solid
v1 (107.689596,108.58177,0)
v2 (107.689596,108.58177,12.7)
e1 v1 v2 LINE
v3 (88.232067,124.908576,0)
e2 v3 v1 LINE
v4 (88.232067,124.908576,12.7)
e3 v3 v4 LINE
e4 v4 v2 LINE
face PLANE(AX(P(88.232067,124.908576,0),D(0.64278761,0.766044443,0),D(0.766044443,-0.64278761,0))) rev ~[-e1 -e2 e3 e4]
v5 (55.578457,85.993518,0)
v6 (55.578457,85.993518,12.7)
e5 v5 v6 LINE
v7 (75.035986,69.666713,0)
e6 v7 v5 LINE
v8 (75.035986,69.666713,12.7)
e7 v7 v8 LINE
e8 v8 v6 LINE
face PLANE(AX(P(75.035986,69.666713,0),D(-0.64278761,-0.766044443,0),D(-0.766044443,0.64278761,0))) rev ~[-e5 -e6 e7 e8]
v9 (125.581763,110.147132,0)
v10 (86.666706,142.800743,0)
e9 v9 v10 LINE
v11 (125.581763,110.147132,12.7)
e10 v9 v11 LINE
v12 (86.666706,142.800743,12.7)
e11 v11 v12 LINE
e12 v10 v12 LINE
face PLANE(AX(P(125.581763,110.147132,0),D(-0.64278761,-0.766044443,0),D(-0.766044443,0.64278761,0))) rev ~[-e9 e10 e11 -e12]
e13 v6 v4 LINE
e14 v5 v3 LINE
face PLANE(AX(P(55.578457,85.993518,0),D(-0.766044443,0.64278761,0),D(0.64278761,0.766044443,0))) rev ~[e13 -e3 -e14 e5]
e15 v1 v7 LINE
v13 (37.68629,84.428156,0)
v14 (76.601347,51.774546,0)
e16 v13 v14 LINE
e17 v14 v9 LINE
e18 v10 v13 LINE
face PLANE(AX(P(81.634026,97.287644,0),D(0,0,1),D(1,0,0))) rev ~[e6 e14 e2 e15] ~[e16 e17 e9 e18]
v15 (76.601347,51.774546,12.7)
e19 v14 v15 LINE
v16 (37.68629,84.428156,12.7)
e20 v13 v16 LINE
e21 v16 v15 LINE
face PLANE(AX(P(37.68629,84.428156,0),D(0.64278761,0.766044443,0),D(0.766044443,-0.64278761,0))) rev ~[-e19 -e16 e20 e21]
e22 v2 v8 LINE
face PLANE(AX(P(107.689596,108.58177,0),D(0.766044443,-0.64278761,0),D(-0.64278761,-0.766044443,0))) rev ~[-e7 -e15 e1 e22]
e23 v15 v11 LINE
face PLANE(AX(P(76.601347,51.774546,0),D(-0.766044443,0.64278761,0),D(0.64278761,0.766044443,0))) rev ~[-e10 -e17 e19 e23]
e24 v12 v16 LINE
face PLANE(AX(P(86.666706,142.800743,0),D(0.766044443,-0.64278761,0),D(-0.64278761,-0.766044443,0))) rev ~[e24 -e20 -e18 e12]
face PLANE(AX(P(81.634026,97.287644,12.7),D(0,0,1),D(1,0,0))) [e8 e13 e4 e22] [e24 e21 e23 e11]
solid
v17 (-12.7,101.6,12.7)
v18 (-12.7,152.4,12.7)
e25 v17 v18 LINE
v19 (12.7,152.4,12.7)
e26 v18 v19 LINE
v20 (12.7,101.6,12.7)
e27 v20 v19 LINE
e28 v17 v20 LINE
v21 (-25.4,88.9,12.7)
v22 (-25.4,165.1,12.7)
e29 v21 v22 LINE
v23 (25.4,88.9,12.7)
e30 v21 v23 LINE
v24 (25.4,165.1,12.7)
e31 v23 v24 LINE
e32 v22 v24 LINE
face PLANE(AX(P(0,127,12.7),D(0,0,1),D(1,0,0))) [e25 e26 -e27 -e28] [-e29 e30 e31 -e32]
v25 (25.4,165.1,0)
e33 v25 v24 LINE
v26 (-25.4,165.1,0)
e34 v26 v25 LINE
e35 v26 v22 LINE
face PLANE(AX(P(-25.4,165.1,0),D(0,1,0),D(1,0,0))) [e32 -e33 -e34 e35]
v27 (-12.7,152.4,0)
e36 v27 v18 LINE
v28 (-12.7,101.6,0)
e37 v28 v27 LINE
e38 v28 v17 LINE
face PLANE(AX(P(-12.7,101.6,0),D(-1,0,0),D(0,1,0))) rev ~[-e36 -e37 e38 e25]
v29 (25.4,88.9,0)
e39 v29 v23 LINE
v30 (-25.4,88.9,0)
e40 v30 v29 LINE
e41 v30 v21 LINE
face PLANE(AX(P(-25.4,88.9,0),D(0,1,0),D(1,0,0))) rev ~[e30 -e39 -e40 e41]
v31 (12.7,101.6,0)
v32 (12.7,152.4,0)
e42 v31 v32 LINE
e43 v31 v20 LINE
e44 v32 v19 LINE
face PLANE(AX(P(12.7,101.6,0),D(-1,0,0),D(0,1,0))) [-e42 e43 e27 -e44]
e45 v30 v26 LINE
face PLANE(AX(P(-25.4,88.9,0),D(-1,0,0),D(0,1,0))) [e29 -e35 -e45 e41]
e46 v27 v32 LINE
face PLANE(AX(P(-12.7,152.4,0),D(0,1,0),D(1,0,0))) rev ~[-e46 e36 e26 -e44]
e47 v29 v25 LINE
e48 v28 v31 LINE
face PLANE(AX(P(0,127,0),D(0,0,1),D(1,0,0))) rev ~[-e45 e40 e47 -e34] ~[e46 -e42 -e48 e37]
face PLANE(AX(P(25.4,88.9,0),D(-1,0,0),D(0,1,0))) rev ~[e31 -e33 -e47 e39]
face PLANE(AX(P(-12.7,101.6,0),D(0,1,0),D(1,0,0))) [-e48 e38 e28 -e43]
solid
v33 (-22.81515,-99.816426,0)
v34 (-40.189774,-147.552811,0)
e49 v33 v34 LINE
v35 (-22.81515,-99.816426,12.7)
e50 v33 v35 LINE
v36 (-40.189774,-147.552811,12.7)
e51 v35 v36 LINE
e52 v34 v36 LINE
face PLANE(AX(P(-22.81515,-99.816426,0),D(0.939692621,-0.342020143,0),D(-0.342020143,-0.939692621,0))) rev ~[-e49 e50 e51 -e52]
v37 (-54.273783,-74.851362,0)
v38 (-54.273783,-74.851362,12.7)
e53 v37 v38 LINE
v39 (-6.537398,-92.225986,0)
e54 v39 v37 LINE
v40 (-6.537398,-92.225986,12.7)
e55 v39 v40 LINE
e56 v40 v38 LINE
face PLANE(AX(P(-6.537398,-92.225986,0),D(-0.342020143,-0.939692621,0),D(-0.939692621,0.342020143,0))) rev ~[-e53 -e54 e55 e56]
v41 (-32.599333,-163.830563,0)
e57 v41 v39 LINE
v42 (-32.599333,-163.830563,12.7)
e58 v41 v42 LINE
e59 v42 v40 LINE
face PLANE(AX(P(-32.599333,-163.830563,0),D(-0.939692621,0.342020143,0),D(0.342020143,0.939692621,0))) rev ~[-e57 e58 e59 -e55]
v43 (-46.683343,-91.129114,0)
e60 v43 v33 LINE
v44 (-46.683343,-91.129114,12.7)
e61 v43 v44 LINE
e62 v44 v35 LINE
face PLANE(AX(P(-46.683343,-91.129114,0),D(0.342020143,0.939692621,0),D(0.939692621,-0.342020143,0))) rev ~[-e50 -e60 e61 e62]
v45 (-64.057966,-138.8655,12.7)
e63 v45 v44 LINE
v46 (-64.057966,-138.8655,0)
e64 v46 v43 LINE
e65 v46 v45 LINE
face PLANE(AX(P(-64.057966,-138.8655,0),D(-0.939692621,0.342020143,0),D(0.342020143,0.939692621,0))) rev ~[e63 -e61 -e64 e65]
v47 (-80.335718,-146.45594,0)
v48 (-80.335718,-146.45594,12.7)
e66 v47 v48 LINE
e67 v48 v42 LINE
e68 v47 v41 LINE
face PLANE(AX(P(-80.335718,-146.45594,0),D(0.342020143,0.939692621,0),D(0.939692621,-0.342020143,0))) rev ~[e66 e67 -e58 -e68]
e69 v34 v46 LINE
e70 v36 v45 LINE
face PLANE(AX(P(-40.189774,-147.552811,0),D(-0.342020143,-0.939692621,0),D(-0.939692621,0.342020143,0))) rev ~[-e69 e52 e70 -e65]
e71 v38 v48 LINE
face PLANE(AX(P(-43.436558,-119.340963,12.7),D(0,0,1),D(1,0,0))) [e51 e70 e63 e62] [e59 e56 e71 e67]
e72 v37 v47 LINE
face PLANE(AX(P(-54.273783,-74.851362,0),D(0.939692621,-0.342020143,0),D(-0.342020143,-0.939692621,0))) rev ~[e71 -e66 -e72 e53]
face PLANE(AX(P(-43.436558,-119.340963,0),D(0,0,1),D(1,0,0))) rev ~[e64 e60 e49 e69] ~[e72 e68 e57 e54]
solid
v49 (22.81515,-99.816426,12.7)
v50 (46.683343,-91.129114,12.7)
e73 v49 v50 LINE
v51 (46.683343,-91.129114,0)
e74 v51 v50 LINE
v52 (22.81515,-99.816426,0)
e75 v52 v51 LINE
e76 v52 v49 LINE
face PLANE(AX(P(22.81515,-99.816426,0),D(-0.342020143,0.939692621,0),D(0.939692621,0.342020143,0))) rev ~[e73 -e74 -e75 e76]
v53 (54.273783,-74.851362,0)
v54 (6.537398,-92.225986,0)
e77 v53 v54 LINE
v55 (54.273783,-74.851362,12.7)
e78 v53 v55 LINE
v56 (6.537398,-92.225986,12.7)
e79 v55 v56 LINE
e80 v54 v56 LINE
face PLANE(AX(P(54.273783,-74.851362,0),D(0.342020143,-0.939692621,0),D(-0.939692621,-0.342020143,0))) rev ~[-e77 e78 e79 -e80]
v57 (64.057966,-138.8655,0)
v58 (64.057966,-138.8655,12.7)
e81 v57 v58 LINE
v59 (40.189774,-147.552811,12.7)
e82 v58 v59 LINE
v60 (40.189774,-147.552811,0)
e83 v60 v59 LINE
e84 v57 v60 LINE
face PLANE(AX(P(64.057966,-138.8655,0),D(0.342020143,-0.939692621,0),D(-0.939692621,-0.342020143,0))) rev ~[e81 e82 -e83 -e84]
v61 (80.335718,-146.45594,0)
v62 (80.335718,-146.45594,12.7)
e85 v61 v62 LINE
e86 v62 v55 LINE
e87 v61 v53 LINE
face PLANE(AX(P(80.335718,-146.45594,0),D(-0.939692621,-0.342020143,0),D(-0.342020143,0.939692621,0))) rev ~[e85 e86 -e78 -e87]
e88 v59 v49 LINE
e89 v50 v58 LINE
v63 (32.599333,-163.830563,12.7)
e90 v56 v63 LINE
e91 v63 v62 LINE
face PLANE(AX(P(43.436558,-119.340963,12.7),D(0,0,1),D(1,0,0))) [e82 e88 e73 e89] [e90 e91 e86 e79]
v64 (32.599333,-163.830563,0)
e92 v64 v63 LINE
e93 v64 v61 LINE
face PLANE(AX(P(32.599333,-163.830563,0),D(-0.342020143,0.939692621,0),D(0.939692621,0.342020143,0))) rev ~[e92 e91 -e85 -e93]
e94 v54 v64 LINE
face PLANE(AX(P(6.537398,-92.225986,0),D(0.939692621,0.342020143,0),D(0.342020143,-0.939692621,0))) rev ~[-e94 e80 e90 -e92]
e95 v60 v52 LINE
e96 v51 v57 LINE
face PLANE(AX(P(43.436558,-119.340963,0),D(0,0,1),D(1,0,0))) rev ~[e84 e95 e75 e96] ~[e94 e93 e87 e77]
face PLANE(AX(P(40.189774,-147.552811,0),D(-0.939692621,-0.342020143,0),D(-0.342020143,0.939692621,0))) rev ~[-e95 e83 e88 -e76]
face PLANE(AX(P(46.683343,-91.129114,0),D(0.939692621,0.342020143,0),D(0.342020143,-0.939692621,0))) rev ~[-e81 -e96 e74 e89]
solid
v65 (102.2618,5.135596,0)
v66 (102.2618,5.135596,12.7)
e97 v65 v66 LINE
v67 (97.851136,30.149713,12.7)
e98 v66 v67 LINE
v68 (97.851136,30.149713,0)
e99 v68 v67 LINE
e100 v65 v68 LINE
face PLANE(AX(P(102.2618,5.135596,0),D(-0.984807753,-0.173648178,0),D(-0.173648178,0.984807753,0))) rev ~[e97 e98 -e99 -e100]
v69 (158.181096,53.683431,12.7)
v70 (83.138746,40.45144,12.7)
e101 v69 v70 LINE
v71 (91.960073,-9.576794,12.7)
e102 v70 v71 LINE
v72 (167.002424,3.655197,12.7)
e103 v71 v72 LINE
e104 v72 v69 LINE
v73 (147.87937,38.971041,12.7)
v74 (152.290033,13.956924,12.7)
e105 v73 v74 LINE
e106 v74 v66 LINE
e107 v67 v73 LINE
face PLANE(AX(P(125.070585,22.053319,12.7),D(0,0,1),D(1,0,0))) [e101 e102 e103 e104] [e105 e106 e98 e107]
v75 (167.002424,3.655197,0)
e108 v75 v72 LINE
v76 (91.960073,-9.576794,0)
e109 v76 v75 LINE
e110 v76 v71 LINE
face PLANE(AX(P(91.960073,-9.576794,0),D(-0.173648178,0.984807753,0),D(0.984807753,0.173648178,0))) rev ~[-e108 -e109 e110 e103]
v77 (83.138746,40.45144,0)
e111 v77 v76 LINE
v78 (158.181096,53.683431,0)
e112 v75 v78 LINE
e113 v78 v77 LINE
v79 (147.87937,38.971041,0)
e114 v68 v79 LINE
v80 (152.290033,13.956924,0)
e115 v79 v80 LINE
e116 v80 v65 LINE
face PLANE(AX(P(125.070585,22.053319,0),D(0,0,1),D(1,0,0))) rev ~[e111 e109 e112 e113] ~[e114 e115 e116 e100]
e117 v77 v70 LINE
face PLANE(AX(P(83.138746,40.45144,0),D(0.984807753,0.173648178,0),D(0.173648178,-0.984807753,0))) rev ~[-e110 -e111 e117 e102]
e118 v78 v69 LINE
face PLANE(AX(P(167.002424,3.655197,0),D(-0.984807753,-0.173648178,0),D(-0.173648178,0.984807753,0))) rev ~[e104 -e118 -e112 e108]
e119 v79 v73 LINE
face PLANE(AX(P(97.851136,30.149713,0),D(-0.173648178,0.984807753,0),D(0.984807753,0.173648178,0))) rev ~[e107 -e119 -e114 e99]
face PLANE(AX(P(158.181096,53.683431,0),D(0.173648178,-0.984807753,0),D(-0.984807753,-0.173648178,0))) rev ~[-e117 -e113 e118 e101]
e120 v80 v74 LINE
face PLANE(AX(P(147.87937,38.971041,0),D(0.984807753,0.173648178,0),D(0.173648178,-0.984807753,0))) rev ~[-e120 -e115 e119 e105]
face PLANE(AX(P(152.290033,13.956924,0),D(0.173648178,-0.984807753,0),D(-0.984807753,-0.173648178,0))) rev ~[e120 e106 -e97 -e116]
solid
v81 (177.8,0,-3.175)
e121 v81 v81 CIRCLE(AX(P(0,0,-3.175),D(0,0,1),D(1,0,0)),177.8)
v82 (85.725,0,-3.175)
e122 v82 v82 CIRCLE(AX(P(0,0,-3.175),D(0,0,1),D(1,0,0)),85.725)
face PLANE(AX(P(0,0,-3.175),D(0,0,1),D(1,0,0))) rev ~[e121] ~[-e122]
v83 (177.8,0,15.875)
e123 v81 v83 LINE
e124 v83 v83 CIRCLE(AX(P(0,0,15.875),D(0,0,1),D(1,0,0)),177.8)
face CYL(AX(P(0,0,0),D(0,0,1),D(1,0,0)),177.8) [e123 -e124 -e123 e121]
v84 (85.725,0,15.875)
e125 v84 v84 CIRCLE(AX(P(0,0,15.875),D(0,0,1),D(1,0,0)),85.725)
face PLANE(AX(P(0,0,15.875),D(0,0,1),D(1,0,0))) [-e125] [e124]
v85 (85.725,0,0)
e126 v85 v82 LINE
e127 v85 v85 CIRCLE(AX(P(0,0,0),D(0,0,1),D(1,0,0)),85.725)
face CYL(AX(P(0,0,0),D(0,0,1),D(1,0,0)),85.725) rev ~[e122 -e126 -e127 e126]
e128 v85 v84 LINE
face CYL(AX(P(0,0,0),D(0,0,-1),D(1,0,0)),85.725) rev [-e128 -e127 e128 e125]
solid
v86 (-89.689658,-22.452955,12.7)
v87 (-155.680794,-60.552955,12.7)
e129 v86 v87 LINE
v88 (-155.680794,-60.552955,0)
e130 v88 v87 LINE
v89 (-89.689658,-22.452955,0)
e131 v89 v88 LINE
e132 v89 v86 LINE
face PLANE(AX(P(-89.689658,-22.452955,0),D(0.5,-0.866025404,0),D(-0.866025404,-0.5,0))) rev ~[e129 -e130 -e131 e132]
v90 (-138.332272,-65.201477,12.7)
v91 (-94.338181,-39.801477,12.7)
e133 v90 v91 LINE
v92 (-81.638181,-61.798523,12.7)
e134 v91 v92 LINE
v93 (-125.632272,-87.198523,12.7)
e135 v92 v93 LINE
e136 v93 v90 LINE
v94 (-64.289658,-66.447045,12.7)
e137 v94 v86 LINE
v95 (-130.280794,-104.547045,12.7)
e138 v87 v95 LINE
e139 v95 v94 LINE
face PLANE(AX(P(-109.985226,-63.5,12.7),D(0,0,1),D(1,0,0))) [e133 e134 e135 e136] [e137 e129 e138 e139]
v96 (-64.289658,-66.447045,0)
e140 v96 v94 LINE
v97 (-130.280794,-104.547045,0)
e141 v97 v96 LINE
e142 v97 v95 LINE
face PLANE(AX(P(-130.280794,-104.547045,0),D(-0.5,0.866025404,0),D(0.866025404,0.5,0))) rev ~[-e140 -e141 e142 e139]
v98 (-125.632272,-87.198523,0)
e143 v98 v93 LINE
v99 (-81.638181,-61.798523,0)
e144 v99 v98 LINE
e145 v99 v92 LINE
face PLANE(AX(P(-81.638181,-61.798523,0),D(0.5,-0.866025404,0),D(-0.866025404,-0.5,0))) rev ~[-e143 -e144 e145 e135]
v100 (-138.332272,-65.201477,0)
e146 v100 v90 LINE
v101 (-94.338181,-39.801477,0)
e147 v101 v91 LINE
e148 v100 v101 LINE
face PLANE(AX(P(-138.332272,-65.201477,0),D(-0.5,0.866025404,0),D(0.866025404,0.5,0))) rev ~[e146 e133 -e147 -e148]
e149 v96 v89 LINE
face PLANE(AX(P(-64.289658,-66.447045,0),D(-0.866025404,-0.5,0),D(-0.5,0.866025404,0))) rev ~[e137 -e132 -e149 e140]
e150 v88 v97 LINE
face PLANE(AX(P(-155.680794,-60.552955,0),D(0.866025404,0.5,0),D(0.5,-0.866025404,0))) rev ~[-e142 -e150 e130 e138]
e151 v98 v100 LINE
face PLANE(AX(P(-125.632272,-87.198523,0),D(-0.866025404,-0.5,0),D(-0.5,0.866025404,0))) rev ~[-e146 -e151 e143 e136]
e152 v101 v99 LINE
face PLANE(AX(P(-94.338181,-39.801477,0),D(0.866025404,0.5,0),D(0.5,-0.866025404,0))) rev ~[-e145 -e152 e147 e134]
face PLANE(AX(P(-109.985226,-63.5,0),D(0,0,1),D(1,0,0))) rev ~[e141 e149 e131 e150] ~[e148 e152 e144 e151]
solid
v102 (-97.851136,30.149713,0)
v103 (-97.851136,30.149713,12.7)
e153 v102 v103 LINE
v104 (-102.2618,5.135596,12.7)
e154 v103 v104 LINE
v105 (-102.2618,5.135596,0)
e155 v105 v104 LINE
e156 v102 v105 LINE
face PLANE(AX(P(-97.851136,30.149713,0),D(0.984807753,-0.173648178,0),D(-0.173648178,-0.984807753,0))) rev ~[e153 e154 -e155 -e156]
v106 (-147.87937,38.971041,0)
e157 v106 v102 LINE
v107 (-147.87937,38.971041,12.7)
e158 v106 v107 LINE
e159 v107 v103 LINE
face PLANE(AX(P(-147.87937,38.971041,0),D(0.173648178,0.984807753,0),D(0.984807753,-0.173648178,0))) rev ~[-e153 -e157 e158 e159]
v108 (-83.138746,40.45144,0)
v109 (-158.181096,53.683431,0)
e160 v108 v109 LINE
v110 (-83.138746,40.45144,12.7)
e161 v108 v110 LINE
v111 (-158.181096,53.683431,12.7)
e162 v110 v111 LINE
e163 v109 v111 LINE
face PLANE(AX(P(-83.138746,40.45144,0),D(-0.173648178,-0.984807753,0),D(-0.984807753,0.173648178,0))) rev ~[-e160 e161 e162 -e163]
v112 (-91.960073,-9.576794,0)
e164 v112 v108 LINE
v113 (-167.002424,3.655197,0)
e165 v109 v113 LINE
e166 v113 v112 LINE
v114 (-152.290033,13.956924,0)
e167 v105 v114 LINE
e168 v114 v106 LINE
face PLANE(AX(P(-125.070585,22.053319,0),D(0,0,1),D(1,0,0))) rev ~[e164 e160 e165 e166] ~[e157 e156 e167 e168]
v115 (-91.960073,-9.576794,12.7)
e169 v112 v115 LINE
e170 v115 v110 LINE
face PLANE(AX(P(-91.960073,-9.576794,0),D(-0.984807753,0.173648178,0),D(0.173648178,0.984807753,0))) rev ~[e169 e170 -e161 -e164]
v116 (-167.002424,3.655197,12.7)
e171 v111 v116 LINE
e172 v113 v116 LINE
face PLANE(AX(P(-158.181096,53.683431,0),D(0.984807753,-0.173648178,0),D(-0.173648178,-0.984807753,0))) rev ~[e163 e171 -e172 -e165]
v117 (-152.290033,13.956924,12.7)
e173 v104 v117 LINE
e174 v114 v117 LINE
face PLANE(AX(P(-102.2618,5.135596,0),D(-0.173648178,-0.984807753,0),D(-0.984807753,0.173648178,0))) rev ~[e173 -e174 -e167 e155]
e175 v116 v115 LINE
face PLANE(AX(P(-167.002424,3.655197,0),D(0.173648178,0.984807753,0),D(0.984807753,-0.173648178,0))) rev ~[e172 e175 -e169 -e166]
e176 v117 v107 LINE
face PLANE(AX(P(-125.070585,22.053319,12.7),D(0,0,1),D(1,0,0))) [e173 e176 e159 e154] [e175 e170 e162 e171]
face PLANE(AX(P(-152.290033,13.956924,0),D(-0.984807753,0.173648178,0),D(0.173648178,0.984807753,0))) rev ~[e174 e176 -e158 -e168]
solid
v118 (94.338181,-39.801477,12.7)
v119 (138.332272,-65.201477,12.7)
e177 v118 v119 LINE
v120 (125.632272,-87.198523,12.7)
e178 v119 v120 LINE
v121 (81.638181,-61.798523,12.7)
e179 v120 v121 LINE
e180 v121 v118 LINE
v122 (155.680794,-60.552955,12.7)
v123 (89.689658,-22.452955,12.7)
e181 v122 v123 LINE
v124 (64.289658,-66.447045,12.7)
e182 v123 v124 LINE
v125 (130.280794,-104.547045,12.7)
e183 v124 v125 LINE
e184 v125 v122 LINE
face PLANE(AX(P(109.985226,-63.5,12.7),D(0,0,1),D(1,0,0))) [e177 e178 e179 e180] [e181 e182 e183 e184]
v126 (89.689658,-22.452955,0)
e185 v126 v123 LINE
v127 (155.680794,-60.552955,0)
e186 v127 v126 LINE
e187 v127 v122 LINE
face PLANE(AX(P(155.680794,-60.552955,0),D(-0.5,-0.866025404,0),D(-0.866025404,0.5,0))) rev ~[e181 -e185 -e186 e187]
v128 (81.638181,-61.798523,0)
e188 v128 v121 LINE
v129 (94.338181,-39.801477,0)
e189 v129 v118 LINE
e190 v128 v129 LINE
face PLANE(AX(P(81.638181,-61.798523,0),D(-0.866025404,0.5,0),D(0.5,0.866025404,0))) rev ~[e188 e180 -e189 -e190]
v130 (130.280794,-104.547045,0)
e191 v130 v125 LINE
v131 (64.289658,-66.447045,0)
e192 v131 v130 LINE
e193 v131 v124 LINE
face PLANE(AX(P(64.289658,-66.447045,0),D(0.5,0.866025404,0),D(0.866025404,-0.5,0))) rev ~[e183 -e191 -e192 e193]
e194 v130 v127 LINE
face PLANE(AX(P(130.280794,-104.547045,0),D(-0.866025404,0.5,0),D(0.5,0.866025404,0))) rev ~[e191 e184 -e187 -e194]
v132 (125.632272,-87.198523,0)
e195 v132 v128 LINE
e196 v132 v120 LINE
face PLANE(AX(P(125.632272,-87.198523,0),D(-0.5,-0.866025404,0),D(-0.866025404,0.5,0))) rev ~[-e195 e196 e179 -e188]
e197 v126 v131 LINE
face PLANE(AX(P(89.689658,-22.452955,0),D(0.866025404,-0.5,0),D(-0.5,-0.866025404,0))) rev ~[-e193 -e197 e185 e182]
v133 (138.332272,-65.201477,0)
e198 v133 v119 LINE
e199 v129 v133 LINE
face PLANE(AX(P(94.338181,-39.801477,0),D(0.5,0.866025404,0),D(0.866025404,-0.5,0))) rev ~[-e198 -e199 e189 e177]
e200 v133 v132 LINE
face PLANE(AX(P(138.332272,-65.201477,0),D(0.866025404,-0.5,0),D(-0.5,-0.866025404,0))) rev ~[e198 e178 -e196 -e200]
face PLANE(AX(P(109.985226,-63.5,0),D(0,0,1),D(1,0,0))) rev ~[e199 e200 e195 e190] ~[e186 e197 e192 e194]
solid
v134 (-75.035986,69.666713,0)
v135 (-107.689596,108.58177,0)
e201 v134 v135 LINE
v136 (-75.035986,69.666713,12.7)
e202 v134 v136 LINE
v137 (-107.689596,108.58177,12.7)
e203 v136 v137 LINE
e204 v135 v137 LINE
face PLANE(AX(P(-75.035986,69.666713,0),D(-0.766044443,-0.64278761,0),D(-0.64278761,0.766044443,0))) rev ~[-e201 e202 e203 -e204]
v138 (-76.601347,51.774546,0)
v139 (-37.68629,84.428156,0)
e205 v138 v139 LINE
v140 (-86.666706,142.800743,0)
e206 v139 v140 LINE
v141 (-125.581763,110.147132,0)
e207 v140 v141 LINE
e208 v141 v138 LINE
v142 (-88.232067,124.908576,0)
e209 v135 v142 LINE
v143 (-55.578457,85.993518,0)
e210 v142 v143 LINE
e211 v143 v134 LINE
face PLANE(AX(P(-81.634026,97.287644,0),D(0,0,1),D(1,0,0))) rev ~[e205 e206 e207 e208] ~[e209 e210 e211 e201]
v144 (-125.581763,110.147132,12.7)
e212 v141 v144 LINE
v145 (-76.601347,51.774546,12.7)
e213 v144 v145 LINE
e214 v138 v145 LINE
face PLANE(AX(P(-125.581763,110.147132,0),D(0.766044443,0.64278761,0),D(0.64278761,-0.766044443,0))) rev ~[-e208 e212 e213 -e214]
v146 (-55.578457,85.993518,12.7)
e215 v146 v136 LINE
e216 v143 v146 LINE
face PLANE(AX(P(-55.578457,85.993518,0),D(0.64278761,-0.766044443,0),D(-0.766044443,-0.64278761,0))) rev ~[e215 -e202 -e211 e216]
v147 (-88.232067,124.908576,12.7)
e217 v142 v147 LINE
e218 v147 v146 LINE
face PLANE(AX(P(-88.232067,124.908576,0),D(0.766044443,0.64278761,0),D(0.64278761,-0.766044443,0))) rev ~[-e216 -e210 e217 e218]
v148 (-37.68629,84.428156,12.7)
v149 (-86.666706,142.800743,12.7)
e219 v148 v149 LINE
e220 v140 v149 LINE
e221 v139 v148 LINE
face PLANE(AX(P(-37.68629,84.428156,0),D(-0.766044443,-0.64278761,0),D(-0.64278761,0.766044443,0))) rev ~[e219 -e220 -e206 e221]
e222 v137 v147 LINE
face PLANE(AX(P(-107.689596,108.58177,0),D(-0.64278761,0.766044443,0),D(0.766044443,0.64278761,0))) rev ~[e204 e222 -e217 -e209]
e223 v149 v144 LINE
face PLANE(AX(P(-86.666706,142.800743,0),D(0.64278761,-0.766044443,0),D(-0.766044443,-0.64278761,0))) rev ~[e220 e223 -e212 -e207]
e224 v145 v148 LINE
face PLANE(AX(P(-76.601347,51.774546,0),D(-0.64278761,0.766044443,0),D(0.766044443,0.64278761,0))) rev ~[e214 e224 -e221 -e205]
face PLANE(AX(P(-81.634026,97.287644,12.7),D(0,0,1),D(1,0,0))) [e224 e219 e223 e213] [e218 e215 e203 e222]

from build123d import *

# Parameters (mm, degrees)
F1_DEPTH      = 12.7
F0_W          = 50.8
F0_H          = 76.2
F0_W_2        = 25.4
F0_H_2        = 50.8
F2_R          = 177.8
F2_R_2        = 85.725
F3_DEPTH      = 15.875
F3_DEPTH_BACK = 3.175


# Not quite as in the source:
# - a feature names something its author has since deleted; it is built from what else it names


with BuildPart() as f1:
    # F0 (on Top) → F1 (new body)
    with BuildSketch(Plane.XY):
        Polygon((-76.6013473564, 51.7745457072), (-37.6862896459, 84.4281562793), (-86.666705504, 142.800742845), (-125.5817632145, 110.1471322729), align=None)
        Polygon((-107.6895961438, 108.5817704883), (-88.2320672886, 124.9085757744), (-55.5784567165, 85.9935180639), (-75.0359855718, 69.6667127779), align=None, mode=Mode.SUBTRACT)
    extrude(amount=F1_DEPTH)


with BuildPart() as f1b:
    # F0 (on Top) → F1, piece 2 (new body)
    with BuildSketch(Plane.XY):
        with Locations((0, 127)):
            Rectangle(F0_W, F0_H)
        with Locations((0, 127)):
            Rectangle(F0_W_2, F0_H_2, mode=Mode.SUBTRACT)
    extrude(amount=F1_DEPTH)


with BuildPart() as f1c:
    # F0 (on Top) → F1, piece 3 (new body)
    with BuildSketch(Plane.XY):
        Polygon((-91.9600729555, -9.5767939319), (-83.13874553, 40.4514399211), (-158.1810963096, 53.6834310593), (-167.0024237351, 3.6551972063), align=None)
        Polygon((-152.2900334154, 13.9569238132), (-147.8793697027, 38.9710407397), (-97.8511358497, 30.1497133142), (-102.2617995624, 5.1355963877), align=None, mode=Mode.SUBTRACT)
    extrude(amount=F1_DEPTH)


with BuildPart() as f1d:
    # F0 (on Top) → F1, piece 4 (new body)
    with BuildSketch(Plane.XY):
        Polygon((37.6862896459, 84.4281562793), (76.6013473564, 51.7745457072), (125.5817632145, 110.1471322729), (86.666705504, 142.800742845), align=None)
        Polygon((88.2320672886, 124.9085757744), (107.6895961438, 108.5817704883), (75.0359855718, 69.6667127779), (55.5784567165, 85.9935180639), align=None, mode=Mode.SUBTRACT)
    extrude(amount=F1_DEPTH)


with BuildPart() as f1e:
    # F0 (on Top) → F1, piece 5 (new body)
    with BuildSketch(Plane.XY):
        Polygon((83.13874553, 40.4514399211), (91.9600729555, -9.5767939319), (167.0024237351, 3.6551972063), (158.1810963096, 53.6834310593), align=None)
        Polygon((147.8793697027, 38.9710407397), (152.2900334154, 13.9569238132), (102.2617995624, 5.1355963877), (97.8511358497, 30.1497133142), align=None, mode=Mode.SUBTRACT)
    extrude(amount=F1_DEPTH)


with BuildPart() as f1f:
    # F0 (on Top) → F1, piece 6 (new body)
    with BuildSketch(Plane.XY):
        Polygon((89.6896583964, -22.4529547439), (64.2896583964, -66.4470452561), (130.2807941648, -104.5470452561), (155.6807941648, -60.5529547439), align=None)
        Polygon((138.3322715367, -65.2014773719), (125.6322715367, -87.1985226281), (81.6381810245, -61.7985226281), (94.3381810245, -39.8014773719), align=None, mode=Mode.SUBTRACT)
    extrude(amount=F1_DEPTH)


with BuildPart() as f1g:
    # F0 (on Top) → F1, piece 7 (new body)
    with BuildSketch(Plane.XY):
        Polygon((54.2737833096, -74.8513623474), (6.5373981737, -92.2259856283), (32.5993330951, -163.8305633322), (80.335718231, -146.4559400513), align=None)
        Polygon((64.0579661268, -138.8654995875), (40.1897735589, -147.552811228), (22.8151502779, -99.8164260921), (46.6833428459, -91.1291144516), align=None, mode=Mode.SUBTRACT)
    extrude(amount=F1_DEPTH)


with BuildPart() as f1h:
    # F0 (on Top) → F1, piece 8 (new body)
    with BuildSketch(Plane.XY):
        Polygon((-6.5373981737, -92.2259856283), (-54.2737833096, -74.8513623474), (-80.335718231, -146.4559400513), (-32.5993330951, -163.8305633322), align=None)
        Polygon((-40.1897735589, -147.552811228), (-64.0579661268, -138.8654995875), (-46.6833428459, -91.1291144516), (-22.8151502779, -99.8164260921), align=None, mode=Mode.SUBTRACT)
    extrude(amount=F1_DEPTH)


with BuildPart() as f1i:
    # F0 (on Top) → F1, piece 9 (new body)
    with BuildSketch(Plane.XY):
        Polygon((-64.2896583964, -66.4470452561), (-89.6896583964, -22.4529547439), (-155.6807941648, -60.5529547439), (-130.2807941648, -104.5470452561), align=None)
        Polygon((-125.6322715367, -87.1985226281), (-138.3322715367, -65.2014773719), (-94.3381810245, -39.8014773719), (-81.6381810245, -61.7985226281), align=None, mode=Mode.SUBTRACT)
    extrude(amount=F1_DEPTH)


with BuildPart() as f3:
    # F2 (on Top) → F3 (new body, two sides)
    with BuildSketch(Plane.XY) as f3_sk:
        Circle(F2_R)
        Circle(F2_R_2, mode=Mode.SUBTRACT)
    extrude(amount=F3_DEPTH)
    extrude(f3_sk.sketch, amount=-F3_DEPTH_BACK)


solid = Compound([f1.part, f1b.part, f1c.part, f1d.part, f1e.part, f1f.part, f1g.part, f1h.part, f1i.part, f3.part])
